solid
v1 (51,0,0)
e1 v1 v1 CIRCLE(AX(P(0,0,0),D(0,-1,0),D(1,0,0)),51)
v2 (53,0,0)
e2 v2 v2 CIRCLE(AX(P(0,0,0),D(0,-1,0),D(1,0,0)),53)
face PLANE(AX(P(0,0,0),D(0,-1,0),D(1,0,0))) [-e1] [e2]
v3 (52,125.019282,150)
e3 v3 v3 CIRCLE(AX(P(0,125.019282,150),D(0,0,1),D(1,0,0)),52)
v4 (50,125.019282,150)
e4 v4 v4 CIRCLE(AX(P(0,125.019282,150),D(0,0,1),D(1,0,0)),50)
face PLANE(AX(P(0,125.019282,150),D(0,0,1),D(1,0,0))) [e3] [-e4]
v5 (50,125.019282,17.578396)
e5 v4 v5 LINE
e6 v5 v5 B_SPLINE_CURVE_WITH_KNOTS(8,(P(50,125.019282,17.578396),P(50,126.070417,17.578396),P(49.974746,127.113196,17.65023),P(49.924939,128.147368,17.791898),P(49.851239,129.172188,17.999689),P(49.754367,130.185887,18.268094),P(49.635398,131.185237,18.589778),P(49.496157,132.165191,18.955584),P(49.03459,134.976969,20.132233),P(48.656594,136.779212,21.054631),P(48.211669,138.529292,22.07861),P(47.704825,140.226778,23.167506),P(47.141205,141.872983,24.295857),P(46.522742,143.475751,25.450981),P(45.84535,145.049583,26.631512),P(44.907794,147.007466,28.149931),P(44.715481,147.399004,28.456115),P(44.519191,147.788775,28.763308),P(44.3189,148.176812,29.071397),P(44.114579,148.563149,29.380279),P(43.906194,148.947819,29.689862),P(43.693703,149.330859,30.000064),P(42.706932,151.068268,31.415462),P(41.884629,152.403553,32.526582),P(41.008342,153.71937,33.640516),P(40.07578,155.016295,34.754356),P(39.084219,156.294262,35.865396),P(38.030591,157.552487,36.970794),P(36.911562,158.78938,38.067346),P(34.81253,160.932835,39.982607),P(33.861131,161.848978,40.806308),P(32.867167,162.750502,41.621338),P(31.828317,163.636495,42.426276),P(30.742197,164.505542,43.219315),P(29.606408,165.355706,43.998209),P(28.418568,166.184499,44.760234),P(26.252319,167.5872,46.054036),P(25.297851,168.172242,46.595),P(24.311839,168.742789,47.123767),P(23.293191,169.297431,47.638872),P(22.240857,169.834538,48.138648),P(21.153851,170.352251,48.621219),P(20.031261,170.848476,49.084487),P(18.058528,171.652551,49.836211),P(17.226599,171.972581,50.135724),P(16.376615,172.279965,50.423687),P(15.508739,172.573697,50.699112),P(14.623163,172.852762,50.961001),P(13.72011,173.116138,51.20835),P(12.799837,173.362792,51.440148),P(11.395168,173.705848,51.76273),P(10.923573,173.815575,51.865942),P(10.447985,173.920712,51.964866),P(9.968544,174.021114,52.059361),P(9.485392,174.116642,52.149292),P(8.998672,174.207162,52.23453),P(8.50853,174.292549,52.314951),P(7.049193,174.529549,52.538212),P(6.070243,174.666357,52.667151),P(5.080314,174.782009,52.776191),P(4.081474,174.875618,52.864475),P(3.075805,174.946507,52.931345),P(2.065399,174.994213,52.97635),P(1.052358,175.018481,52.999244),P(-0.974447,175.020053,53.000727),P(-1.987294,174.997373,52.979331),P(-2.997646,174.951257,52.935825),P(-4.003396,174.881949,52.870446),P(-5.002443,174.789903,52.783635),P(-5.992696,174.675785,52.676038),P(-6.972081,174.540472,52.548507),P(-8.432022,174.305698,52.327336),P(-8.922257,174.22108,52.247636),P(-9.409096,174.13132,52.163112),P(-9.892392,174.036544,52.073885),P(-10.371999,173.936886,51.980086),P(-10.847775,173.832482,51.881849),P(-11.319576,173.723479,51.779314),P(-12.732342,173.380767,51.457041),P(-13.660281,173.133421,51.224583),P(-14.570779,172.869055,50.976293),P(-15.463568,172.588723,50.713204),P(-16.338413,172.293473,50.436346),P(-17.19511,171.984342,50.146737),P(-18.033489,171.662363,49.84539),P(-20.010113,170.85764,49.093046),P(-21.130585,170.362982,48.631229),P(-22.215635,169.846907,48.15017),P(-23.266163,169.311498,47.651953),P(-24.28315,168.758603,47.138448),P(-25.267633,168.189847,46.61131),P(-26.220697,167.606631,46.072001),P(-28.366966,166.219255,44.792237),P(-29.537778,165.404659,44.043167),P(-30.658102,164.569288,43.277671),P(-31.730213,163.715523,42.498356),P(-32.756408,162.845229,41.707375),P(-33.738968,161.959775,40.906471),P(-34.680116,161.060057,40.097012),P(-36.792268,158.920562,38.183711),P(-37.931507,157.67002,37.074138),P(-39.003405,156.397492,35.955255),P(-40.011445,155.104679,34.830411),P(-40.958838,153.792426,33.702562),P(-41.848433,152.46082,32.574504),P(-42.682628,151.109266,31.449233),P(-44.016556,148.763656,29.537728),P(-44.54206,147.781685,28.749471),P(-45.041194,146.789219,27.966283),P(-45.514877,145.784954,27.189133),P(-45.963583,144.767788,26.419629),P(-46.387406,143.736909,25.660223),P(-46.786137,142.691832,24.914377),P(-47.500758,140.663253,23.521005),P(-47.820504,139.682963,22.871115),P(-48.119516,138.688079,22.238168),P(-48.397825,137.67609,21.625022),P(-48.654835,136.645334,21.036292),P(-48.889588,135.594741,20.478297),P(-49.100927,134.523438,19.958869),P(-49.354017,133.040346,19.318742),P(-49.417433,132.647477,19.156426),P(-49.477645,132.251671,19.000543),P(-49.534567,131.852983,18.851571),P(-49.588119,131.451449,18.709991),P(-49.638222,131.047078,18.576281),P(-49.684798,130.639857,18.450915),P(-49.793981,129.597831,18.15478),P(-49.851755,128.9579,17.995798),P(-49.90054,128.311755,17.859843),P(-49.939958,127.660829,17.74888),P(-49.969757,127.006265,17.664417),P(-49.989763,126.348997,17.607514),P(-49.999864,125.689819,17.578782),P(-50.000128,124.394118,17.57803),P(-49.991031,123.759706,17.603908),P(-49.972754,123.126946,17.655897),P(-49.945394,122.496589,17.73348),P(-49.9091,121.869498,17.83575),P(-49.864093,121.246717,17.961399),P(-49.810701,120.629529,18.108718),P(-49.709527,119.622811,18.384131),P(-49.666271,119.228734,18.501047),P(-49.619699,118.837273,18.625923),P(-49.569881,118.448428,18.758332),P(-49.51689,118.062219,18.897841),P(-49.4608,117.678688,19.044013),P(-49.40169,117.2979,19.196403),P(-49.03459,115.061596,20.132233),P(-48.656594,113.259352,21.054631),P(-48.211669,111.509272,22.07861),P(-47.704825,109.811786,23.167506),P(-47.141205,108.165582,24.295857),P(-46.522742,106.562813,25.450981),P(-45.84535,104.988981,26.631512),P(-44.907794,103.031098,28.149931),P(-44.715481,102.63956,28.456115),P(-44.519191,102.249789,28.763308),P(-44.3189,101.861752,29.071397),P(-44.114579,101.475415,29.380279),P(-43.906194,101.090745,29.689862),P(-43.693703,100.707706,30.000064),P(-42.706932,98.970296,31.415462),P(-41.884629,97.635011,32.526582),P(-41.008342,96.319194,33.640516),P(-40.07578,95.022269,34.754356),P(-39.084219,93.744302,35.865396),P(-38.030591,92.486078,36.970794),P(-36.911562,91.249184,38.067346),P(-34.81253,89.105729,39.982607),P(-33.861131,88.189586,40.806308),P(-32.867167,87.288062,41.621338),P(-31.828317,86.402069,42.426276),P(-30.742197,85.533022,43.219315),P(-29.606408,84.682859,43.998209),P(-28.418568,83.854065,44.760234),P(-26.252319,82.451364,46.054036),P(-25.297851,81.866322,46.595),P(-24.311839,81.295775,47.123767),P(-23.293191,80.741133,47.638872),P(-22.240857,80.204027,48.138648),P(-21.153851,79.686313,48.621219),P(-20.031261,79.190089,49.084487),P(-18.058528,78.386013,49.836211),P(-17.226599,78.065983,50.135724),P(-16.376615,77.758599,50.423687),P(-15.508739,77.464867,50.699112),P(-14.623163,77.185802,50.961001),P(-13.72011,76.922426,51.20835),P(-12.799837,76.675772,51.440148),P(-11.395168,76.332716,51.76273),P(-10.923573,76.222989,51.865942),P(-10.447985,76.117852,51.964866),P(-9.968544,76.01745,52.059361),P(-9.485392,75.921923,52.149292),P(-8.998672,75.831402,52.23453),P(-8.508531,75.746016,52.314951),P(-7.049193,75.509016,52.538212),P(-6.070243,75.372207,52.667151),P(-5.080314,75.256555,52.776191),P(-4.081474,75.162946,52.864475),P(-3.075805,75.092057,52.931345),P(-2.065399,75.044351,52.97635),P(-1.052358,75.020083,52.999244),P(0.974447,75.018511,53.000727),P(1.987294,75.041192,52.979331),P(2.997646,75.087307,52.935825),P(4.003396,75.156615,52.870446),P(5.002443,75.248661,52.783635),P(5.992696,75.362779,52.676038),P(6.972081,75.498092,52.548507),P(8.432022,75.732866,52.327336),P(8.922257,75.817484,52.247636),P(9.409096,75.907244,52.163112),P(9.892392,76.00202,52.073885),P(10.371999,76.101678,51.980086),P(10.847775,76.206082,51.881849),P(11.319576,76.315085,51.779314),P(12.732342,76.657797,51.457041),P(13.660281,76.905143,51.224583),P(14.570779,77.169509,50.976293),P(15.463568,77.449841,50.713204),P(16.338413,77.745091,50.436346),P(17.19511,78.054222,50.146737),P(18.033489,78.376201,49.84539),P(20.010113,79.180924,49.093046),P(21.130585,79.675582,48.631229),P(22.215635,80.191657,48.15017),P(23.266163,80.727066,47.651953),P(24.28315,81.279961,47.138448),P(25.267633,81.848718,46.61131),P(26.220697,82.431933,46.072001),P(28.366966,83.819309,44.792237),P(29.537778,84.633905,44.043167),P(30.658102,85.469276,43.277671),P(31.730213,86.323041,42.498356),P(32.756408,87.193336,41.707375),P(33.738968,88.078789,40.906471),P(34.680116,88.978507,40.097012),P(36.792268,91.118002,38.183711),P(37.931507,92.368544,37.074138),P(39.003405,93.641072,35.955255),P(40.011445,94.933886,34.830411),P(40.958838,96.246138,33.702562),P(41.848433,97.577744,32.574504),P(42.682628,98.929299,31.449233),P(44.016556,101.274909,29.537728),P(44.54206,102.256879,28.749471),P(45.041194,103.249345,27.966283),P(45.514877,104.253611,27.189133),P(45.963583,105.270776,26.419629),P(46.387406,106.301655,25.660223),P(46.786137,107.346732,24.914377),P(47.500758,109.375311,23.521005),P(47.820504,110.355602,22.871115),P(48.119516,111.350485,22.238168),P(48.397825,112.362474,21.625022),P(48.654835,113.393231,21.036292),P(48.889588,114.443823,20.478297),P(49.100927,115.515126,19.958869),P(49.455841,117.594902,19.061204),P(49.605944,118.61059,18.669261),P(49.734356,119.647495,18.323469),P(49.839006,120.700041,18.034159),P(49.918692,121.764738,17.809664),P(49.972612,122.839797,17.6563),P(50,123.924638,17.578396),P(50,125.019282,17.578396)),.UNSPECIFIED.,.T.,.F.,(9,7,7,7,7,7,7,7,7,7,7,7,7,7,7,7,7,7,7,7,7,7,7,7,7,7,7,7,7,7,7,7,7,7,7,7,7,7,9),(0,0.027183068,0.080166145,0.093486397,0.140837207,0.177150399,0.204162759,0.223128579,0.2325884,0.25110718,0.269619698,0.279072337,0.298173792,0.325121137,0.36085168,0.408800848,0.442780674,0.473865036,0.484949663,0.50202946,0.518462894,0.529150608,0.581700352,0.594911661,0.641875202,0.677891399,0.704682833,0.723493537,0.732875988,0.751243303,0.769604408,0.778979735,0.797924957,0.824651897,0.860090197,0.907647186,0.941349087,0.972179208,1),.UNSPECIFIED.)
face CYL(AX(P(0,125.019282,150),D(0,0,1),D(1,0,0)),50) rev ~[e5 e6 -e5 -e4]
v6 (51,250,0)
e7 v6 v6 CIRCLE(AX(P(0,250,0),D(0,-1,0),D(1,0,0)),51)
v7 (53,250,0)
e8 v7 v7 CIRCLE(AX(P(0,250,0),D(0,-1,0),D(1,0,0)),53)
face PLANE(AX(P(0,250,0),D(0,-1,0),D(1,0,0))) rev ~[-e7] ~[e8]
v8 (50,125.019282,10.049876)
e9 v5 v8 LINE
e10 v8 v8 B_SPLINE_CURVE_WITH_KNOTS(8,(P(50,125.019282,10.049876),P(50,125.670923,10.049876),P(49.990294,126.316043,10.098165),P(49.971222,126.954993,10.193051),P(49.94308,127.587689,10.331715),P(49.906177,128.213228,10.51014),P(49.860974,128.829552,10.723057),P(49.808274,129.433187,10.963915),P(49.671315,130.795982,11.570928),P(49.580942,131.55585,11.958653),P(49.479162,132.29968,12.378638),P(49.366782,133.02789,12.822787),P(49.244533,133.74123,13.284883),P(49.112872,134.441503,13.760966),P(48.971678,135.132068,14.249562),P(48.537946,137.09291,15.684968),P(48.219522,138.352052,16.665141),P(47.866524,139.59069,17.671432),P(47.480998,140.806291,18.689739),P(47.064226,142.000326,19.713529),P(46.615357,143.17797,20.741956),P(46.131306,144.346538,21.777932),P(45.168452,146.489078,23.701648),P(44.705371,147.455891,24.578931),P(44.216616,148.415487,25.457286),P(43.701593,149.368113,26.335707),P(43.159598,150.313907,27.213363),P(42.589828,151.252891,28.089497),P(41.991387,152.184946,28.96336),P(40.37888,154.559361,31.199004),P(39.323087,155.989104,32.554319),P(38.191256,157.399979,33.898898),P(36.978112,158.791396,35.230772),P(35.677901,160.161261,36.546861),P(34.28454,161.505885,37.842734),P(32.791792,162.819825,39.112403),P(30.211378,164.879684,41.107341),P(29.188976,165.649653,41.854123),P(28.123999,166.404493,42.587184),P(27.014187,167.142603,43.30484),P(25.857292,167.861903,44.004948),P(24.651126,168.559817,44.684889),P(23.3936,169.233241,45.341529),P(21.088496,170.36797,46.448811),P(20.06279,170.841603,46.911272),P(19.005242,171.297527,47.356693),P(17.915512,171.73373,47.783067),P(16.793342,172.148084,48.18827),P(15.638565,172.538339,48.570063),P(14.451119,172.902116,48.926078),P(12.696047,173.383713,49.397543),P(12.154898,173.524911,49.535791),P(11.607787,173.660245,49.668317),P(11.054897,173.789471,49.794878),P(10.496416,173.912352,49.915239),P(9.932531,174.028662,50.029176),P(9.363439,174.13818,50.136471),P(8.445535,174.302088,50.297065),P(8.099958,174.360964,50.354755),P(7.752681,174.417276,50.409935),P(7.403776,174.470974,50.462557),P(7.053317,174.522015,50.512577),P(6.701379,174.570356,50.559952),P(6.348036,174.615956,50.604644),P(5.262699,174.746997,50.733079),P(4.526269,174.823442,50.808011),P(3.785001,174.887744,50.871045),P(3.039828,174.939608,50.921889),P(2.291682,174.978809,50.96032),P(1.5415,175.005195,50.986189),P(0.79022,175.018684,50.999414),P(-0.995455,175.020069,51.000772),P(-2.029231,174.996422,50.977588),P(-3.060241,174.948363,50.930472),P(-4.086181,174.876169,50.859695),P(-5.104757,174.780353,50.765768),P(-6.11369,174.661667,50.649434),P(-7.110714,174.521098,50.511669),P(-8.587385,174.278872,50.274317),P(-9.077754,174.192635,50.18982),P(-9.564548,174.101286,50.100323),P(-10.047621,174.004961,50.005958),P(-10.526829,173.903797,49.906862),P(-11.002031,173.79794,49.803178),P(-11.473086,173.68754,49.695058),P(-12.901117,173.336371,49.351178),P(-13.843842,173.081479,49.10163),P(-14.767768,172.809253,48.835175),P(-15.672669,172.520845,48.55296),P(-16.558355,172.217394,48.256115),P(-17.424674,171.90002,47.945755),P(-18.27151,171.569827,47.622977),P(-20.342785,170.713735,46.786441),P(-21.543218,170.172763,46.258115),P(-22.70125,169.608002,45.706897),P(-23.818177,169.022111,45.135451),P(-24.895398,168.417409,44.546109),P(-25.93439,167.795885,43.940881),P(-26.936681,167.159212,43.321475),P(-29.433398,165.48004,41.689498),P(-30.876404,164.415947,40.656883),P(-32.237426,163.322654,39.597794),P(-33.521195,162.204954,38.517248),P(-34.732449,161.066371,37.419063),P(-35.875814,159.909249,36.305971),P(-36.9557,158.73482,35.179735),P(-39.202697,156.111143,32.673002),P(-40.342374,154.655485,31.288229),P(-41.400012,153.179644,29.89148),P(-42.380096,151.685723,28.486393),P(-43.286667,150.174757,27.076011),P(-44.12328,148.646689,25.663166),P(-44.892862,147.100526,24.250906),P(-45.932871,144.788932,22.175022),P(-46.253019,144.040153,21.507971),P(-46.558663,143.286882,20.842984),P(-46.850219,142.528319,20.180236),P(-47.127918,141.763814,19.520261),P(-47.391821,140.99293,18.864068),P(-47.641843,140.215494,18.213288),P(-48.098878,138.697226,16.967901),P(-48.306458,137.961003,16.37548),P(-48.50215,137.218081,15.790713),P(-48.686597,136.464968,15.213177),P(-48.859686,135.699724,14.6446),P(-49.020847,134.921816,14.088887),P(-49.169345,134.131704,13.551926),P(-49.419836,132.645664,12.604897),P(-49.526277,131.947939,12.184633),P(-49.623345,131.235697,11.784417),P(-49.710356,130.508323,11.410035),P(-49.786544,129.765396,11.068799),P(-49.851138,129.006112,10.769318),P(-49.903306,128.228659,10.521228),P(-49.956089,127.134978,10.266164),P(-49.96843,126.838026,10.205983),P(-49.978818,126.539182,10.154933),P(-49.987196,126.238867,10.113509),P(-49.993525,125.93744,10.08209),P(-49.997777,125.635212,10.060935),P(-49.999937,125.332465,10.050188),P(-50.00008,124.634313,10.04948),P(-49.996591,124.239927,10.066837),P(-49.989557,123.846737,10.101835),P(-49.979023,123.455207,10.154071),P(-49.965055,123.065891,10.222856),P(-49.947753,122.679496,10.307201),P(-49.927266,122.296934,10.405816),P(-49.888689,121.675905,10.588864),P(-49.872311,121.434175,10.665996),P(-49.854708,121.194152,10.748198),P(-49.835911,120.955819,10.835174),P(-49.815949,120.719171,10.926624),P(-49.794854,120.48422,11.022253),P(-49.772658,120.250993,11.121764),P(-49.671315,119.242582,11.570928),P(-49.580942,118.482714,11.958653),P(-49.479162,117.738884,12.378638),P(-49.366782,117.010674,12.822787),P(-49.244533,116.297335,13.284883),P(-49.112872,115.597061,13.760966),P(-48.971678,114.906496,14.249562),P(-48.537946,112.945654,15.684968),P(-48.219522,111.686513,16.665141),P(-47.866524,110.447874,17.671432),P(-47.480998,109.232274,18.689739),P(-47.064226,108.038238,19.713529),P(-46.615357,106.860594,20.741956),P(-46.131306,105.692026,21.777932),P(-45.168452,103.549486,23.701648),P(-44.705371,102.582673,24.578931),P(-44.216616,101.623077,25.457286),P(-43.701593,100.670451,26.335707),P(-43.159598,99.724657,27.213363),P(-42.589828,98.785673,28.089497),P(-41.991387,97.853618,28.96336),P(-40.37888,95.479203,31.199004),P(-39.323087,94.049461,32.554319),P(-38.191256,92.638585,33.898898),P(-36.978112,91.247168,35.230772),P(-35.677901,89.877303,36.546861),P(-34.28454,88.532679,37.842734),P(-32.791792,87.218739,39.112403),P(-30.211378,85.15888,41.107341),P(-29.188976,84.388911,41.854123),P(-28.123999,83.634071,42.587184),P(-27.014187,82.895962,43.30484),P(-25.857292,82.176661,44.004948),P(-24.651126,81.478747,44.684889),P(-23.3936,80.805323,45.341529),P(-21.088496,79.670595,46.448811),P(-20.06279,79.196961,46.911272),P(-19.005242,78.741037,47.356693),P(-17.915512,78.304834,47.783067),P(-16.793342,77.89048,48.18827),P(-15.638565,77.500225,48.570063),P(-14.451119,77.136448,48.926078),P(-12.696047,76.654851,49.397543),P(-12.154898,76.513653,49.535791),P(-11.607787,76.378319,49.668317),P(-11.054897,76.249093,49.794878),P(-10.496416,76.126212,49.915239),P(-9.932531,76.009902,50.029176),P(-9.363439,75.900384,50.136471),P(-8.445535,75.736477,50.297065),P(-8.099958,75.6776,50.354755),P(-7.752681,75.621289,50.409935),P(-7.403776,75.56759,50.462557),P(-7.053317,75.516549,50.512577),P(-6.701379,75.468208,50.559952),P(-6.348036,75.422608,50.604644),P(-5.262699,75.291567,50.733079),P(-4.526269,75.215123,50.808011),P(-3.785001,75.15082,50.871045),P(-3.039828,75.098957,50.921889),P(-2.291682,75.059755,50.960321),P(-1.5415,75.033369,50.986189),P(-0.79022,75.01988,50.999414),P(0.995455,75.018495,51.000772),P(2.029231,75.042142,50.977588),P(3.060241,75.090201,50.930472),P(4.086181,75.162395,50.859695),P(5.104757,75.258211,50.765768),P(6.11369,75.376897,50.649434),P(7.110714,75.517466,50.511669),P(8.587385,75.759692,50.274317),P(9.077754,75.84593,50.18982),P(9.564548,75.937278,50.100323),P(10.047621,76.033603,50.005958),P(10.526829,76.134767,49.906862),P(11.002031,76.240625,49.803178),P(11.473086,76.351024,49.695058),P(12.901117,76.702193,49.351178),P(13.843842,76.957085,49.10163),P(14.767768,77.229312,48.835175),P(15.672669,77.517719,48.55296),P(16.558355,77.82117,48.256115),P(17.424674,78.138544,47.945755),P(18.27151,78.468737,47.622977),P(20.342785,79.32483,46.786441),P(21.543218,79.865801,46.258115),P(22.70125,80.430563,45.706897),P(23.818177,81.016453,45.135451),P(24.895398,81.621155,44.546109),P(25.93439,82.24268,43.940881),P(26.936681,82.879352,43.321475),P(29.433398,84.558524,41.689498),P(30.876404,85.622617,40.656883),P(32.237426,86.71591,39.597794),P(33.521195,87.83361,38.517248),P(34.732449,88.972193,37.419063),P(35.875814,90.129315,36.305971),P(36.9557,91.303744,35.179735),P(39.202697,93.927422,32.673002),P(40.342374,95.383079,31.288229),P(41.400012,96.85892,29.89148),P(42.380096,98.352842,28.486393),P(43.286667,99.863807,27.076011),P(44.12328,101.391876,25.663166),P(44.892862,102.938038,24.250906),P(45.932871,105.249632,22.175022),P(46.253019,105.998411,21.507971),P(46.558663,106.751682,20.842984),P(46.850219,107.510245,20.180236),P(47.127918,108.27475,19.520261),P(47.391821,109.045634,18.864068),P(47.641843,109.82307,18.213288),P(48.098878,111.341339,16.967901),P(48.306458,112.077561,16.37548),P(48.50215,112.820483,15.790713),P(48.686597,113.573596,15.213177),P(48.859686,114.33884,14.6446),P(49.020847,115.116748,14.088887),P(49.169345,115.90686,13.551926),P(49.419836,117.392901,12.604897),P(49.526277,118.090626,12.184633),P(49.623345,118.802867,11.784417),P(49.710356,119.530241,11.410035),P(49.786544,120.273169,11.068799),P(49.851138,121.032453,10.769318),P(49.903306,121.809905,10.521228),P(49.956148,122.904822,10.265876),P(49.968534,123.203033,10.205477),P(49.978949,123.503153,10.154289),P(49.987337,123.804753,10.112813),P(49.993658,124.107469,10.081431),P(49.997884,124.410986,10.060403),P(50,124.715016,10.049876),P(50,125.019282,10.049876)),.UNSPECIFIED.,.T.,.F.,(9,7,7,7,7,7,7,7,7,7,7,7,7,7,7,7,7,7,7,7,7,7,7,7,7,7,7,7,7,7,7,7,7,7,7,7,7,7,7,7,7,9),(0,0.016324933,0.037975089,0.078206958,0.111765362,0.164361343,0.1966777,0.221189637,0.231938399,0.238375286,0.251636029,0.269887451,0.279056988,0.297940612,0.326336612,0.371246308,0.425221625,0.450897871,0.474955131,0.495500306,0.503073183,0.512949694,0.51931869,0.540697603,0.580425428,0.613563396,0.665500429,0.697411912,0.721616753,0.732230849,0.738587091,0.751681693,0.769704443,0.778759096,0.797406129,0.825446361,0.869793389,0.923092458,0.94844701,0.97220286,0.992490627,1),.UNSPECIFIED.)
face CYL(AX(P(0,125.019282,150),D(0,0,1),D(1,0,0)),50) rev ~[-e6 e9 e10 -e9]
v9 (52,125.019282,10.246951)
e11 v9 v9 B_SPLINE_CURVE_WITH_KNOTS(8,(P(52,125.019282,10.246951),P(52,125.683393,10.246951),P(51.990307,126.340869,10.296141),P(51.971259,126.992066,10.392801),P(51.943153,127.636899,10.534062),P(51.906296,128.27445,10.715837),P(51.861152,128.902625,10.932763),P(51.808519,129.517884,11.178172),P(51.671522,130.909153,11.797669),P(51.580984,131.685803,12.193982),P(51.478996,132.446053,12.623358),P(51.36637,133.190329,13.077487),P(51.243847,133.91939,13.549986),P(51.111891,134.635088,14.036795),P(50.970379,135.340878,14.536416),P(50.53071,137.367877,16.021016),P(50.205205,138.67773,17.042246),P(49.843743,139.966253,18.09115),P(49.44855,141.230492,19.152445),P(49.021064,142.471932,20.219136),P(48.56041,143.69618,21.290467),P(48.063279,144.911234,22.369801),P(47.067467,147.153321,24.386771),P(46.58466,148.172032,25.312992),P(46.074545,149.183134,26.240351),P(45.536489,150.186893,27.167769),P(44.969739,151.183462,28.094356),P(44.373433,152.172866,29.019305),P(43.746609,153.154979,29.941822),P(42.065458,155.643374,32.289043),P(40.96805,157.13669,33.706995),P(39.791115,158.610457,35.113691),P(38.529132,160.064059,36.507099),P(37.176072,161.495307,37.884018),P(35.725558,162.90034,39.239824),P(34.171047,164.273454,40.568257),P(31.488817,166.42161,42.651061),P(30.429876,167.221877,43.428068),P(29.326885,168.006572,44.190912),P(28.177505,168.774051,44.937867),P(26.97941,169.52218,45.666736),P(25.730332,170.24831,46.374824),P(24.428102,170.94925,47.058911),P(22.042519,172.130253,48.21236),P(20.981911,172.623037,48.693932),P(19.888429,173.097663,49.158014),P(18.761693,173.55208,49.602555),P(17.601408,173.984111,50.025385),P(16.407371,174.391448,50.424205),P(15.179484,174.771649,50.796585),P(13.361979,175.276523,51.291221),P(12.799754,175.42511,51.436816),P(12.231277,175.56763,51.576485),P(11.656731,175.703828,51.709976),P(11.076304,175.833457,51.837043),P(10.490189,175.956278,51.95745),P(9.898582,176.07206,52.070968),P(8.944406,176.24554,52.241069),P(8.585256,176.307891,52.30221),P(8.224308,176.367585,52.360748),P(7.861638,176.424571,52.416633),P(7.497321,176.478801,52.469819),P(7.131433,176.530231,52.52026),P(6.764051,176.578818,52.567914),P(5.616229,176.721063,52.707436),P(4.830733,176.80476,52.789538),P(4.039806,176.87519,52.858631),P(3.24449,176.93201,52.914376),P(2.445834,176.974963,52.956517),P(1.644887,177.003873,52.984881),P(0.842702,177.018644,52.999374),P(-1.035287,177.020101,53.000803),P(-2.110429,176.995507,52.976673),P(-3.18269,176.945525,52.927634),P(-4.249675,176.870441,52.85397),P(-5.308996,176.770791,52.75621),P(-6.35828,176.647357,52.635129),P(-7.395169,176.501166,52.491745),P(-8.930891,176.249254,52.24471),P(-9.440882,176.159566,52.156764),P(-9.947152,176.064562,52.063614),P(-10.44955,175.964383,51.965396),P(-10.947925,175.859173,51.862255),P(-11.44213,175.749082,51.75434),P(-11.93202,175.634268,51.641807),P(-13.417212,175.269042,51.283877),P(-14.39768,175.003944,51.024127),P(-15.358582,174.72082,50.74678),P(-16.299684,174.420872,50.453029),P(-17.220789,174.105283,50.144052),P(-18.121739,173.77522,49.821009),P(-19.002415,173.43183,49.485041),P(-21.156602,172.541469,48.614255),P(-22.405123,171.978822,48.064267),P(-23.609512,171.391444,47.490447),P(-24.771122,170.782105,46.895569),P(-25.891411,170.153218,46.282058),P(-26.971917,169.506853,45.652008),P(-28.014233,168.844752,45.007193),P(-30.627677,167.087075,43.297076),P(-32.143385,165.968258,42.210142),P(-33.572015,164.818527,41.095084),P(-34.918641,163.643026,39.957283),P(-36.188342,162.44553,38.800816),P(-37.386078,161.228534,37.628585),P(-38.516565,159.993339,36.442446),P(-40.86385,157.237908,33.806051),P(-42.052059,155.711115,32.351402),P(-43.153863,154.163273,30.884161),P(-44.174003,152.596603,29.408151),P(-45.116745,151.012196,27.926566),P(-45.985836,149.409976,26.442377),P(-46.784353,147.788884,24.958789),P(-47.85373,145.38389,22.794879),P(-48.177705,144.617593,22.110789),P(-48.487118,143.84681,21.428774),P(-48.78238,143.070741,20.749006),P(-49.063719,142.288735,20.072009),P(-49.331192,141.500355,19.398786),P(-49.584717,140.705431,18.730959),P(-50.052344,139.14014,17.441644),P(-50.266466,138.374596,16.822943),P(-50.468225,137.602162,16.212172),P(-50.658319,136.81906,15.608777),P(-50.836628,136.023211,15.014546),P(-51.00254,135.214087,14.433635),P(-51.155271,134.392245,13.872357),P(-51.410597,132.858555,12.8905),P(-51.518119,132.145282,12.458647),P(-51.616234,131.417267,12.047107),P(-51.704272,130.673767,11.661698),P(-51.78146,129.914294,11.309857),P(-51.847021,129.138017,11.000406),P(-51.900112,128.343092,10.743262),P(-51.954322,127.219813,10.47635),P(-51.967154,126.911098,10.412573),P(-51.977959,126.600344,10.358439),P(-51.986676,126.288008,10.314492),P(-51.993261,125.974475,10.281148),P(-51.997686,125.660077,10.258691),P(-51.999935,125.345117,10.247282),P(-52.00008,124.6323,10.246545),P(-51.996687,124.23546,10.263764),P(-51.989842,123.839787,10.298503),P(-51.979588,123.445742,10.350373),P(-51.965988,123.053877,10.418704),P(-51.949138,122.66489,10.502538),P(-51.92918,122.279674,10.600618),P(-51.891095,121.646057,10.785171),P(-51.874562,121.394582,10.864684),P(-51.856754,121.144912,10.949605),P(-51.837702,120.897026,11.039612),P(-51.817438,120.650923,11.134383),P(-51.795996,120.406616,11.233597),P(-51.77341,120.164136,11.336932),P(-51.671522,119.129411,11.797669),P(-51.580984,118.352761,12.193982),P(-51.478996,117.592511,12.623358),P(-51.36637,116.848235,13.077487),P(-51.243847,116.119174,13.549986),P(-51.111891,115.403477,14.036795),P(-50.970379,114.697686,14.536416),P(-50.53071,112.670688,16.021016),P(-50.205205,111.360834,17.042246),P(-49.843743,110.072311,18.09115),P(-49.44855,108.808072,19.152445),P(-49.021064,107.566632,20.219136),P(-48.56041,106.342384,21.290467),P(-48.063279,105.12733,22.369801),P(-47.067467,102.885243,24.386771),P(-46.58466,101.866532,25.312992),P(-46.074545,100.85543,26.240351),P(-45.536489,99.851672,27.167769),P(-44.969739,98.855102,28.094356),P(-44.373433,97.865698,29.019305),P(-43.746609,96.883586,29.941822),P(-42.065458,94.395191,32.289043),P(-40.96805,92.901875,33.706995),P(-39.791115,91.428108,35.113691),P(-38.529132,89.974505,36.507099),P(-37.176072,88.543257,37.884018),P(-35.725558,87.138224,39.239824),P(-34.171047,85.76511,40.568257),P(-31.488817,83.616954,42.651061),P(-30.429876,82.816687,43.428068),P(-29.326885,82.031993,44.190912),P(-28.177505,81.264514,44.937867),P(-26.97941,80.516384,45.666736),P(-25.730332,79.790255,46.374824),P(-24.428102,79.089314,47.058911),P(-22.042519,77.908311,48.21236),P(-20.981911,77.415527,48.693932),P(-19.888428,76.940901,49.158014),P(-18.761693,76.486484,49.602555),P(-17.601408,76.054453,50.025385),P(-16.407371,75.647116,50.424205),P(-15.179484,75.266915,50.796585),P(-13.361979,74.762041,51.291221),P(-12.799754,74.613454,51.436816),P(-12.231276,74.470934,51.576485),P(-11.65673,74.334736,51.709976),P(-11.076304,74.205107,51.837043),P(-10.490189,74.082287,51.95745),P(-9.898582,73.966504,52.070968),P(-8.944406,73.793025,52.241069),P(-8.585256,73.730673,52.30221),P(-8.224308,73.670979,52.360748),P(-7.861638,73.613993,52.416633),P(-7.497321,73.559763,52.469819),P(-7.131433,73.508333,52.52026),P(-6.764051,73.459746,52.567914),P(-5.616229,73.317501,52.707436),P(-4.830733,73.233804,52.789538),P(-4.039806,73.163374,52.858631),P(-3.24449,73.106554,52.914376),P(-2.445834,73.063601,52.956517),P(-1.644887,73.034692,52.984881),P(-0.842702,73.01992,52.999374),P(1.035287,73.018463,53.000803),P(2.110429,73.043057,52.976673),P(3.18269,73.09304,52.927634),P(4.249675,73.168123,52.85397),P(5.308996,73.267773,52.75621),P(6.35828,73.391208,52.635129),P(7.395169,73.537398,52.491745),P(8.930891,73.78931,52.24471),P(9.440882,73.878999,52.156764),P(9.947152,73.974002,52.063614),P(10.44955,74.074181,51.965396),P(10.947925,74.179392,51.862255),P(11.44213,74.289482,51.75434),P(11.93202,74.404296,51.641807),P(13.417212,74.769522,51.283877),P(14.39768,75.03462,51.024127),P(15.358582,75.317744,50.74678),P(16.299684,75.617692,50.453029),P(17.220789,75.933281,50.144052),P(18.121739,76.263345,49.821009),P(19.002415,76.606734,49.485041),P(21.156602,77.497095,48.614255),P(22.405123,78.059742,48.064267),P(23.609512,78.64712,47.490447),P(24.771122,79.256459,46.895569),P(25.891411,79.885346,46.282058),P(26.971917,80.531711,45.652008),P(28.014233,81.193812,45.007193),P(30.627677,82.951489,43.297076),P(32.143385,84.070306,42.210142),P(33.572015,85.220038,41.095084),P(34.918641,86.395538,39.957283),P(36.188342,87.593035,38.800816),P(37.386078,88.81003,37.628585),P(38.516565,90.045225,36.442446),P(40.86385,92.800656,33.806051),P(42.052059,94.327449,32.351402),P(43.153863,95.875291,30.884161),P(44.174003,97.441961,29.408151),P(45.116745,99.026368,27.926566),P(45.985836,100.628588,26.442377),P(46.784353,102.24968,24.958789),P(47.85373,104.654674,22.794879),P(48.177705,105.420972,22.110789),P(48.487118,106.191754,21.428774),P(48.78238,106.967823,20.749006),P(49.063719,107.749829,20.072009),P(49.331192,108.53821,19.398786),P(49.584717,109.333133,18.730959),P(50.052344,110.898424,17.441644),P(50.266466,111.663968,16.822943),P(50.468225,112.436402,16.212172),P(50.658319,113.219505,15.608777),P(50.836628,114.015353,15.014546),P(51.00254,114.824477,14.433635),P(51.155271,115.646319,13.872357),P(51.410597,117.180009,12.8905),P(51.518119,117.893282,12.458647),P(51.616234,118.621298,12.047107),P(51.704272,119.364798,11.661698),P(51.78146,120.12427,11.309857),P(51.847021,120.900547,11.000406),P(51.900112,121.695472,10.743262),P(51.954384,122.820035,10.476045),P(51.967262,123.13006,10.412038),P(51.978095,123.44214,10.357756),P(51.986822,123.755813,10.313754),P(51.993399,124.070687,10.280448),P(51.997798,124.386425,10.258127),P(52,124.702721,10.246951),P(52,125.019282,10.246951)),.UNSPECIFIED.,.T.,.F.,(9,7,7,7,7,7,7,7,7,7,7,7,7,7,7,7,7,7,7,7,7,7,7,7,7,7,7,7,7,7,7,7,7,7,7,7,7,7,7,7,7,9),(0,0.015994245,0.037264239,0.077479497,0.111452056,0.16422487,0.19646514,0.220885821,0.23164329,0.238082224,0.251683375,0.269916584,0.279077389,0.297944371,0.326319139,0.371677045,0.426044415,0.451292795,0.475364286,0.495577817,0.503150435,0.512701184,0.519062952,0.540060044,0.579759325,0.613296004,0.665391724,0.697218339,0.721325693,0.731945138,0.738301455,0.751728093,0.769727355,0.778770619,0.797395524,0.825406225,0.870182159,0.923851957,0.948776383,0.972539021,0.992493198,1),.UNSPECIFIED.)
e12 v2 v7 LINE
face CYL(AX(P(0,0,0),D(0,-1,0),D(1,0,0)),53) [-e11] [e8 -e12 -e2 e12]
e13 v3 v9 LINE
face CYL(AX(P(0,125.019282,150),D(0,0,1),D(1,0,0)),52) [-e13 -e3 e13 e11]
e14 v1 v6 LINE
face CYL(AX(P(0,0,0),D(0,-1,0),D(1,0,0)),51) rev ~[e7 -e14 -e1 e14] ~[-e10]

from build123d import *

# Parameters (mm, degrees)
F0_R     = 53
F0_R_2   = 51
F1_DEPTH = 250
F3_R     = 52
F3_R_2   = 50
F4_REACH = 350.0792104868
F5_R     = 50
F6_REACH = 344.4223563373


with BuildPart() as f1:
    # F0 (on Front) → F1 (new body)
    with BuildSketch(Plane.XZ):
        Circle(F0_R)
        Circle(F0_R_2, mode=Mode.SUBTRACT)
    extrude(amount=-F1_DEPTH)

    f4_end = f1.faces().sort_by_distance((-53, 125, 0))[0]
    # F3 (on offset) → F4 (join, up to a face of the model that its end follows)
    with BuildSketch(Plane.XY.offset(150)):
        with Locations((0, 125.0192821026)):
            Circle(F3_R)
        with Locations((0, 125.0192821026)):
            Circle(F3_R_2, mode=Mode.SUBTRACT)
    f4_long = extrude(amount=-F4_REACH, mode=Mode.PRIVATE)
    add(split(f4_long, bisect_by=f4_end, keep=Keep.ALL, mode=Mode.PRIVATE).solids().sort_by_distance((-50.5292178951, 125.0192821026, 150))[0])

    f6_end = f1.faces().sort_by_distance((-51, 125, 0))[0]
    # F5 (on offset) → F6 (cut, up to a face of the model that its end follows)
    with BuildSketch(Plane.XY.offset(150)):
        with Locations((0, 125.0192821026)):
            Circle(F5_R)
    f6_long = extrude(amount=-F6_REACH, mode=Mode.PRIVATE)
    add(split(f6_long, bisect_by=f6_end, keep=Keep.ALL, mode=Mode.PRIVATE).solids().sort_by_distance((0, 125.0192821026, 150))[0], mode=Mode.SUBTRACT)


solid = f1.part
